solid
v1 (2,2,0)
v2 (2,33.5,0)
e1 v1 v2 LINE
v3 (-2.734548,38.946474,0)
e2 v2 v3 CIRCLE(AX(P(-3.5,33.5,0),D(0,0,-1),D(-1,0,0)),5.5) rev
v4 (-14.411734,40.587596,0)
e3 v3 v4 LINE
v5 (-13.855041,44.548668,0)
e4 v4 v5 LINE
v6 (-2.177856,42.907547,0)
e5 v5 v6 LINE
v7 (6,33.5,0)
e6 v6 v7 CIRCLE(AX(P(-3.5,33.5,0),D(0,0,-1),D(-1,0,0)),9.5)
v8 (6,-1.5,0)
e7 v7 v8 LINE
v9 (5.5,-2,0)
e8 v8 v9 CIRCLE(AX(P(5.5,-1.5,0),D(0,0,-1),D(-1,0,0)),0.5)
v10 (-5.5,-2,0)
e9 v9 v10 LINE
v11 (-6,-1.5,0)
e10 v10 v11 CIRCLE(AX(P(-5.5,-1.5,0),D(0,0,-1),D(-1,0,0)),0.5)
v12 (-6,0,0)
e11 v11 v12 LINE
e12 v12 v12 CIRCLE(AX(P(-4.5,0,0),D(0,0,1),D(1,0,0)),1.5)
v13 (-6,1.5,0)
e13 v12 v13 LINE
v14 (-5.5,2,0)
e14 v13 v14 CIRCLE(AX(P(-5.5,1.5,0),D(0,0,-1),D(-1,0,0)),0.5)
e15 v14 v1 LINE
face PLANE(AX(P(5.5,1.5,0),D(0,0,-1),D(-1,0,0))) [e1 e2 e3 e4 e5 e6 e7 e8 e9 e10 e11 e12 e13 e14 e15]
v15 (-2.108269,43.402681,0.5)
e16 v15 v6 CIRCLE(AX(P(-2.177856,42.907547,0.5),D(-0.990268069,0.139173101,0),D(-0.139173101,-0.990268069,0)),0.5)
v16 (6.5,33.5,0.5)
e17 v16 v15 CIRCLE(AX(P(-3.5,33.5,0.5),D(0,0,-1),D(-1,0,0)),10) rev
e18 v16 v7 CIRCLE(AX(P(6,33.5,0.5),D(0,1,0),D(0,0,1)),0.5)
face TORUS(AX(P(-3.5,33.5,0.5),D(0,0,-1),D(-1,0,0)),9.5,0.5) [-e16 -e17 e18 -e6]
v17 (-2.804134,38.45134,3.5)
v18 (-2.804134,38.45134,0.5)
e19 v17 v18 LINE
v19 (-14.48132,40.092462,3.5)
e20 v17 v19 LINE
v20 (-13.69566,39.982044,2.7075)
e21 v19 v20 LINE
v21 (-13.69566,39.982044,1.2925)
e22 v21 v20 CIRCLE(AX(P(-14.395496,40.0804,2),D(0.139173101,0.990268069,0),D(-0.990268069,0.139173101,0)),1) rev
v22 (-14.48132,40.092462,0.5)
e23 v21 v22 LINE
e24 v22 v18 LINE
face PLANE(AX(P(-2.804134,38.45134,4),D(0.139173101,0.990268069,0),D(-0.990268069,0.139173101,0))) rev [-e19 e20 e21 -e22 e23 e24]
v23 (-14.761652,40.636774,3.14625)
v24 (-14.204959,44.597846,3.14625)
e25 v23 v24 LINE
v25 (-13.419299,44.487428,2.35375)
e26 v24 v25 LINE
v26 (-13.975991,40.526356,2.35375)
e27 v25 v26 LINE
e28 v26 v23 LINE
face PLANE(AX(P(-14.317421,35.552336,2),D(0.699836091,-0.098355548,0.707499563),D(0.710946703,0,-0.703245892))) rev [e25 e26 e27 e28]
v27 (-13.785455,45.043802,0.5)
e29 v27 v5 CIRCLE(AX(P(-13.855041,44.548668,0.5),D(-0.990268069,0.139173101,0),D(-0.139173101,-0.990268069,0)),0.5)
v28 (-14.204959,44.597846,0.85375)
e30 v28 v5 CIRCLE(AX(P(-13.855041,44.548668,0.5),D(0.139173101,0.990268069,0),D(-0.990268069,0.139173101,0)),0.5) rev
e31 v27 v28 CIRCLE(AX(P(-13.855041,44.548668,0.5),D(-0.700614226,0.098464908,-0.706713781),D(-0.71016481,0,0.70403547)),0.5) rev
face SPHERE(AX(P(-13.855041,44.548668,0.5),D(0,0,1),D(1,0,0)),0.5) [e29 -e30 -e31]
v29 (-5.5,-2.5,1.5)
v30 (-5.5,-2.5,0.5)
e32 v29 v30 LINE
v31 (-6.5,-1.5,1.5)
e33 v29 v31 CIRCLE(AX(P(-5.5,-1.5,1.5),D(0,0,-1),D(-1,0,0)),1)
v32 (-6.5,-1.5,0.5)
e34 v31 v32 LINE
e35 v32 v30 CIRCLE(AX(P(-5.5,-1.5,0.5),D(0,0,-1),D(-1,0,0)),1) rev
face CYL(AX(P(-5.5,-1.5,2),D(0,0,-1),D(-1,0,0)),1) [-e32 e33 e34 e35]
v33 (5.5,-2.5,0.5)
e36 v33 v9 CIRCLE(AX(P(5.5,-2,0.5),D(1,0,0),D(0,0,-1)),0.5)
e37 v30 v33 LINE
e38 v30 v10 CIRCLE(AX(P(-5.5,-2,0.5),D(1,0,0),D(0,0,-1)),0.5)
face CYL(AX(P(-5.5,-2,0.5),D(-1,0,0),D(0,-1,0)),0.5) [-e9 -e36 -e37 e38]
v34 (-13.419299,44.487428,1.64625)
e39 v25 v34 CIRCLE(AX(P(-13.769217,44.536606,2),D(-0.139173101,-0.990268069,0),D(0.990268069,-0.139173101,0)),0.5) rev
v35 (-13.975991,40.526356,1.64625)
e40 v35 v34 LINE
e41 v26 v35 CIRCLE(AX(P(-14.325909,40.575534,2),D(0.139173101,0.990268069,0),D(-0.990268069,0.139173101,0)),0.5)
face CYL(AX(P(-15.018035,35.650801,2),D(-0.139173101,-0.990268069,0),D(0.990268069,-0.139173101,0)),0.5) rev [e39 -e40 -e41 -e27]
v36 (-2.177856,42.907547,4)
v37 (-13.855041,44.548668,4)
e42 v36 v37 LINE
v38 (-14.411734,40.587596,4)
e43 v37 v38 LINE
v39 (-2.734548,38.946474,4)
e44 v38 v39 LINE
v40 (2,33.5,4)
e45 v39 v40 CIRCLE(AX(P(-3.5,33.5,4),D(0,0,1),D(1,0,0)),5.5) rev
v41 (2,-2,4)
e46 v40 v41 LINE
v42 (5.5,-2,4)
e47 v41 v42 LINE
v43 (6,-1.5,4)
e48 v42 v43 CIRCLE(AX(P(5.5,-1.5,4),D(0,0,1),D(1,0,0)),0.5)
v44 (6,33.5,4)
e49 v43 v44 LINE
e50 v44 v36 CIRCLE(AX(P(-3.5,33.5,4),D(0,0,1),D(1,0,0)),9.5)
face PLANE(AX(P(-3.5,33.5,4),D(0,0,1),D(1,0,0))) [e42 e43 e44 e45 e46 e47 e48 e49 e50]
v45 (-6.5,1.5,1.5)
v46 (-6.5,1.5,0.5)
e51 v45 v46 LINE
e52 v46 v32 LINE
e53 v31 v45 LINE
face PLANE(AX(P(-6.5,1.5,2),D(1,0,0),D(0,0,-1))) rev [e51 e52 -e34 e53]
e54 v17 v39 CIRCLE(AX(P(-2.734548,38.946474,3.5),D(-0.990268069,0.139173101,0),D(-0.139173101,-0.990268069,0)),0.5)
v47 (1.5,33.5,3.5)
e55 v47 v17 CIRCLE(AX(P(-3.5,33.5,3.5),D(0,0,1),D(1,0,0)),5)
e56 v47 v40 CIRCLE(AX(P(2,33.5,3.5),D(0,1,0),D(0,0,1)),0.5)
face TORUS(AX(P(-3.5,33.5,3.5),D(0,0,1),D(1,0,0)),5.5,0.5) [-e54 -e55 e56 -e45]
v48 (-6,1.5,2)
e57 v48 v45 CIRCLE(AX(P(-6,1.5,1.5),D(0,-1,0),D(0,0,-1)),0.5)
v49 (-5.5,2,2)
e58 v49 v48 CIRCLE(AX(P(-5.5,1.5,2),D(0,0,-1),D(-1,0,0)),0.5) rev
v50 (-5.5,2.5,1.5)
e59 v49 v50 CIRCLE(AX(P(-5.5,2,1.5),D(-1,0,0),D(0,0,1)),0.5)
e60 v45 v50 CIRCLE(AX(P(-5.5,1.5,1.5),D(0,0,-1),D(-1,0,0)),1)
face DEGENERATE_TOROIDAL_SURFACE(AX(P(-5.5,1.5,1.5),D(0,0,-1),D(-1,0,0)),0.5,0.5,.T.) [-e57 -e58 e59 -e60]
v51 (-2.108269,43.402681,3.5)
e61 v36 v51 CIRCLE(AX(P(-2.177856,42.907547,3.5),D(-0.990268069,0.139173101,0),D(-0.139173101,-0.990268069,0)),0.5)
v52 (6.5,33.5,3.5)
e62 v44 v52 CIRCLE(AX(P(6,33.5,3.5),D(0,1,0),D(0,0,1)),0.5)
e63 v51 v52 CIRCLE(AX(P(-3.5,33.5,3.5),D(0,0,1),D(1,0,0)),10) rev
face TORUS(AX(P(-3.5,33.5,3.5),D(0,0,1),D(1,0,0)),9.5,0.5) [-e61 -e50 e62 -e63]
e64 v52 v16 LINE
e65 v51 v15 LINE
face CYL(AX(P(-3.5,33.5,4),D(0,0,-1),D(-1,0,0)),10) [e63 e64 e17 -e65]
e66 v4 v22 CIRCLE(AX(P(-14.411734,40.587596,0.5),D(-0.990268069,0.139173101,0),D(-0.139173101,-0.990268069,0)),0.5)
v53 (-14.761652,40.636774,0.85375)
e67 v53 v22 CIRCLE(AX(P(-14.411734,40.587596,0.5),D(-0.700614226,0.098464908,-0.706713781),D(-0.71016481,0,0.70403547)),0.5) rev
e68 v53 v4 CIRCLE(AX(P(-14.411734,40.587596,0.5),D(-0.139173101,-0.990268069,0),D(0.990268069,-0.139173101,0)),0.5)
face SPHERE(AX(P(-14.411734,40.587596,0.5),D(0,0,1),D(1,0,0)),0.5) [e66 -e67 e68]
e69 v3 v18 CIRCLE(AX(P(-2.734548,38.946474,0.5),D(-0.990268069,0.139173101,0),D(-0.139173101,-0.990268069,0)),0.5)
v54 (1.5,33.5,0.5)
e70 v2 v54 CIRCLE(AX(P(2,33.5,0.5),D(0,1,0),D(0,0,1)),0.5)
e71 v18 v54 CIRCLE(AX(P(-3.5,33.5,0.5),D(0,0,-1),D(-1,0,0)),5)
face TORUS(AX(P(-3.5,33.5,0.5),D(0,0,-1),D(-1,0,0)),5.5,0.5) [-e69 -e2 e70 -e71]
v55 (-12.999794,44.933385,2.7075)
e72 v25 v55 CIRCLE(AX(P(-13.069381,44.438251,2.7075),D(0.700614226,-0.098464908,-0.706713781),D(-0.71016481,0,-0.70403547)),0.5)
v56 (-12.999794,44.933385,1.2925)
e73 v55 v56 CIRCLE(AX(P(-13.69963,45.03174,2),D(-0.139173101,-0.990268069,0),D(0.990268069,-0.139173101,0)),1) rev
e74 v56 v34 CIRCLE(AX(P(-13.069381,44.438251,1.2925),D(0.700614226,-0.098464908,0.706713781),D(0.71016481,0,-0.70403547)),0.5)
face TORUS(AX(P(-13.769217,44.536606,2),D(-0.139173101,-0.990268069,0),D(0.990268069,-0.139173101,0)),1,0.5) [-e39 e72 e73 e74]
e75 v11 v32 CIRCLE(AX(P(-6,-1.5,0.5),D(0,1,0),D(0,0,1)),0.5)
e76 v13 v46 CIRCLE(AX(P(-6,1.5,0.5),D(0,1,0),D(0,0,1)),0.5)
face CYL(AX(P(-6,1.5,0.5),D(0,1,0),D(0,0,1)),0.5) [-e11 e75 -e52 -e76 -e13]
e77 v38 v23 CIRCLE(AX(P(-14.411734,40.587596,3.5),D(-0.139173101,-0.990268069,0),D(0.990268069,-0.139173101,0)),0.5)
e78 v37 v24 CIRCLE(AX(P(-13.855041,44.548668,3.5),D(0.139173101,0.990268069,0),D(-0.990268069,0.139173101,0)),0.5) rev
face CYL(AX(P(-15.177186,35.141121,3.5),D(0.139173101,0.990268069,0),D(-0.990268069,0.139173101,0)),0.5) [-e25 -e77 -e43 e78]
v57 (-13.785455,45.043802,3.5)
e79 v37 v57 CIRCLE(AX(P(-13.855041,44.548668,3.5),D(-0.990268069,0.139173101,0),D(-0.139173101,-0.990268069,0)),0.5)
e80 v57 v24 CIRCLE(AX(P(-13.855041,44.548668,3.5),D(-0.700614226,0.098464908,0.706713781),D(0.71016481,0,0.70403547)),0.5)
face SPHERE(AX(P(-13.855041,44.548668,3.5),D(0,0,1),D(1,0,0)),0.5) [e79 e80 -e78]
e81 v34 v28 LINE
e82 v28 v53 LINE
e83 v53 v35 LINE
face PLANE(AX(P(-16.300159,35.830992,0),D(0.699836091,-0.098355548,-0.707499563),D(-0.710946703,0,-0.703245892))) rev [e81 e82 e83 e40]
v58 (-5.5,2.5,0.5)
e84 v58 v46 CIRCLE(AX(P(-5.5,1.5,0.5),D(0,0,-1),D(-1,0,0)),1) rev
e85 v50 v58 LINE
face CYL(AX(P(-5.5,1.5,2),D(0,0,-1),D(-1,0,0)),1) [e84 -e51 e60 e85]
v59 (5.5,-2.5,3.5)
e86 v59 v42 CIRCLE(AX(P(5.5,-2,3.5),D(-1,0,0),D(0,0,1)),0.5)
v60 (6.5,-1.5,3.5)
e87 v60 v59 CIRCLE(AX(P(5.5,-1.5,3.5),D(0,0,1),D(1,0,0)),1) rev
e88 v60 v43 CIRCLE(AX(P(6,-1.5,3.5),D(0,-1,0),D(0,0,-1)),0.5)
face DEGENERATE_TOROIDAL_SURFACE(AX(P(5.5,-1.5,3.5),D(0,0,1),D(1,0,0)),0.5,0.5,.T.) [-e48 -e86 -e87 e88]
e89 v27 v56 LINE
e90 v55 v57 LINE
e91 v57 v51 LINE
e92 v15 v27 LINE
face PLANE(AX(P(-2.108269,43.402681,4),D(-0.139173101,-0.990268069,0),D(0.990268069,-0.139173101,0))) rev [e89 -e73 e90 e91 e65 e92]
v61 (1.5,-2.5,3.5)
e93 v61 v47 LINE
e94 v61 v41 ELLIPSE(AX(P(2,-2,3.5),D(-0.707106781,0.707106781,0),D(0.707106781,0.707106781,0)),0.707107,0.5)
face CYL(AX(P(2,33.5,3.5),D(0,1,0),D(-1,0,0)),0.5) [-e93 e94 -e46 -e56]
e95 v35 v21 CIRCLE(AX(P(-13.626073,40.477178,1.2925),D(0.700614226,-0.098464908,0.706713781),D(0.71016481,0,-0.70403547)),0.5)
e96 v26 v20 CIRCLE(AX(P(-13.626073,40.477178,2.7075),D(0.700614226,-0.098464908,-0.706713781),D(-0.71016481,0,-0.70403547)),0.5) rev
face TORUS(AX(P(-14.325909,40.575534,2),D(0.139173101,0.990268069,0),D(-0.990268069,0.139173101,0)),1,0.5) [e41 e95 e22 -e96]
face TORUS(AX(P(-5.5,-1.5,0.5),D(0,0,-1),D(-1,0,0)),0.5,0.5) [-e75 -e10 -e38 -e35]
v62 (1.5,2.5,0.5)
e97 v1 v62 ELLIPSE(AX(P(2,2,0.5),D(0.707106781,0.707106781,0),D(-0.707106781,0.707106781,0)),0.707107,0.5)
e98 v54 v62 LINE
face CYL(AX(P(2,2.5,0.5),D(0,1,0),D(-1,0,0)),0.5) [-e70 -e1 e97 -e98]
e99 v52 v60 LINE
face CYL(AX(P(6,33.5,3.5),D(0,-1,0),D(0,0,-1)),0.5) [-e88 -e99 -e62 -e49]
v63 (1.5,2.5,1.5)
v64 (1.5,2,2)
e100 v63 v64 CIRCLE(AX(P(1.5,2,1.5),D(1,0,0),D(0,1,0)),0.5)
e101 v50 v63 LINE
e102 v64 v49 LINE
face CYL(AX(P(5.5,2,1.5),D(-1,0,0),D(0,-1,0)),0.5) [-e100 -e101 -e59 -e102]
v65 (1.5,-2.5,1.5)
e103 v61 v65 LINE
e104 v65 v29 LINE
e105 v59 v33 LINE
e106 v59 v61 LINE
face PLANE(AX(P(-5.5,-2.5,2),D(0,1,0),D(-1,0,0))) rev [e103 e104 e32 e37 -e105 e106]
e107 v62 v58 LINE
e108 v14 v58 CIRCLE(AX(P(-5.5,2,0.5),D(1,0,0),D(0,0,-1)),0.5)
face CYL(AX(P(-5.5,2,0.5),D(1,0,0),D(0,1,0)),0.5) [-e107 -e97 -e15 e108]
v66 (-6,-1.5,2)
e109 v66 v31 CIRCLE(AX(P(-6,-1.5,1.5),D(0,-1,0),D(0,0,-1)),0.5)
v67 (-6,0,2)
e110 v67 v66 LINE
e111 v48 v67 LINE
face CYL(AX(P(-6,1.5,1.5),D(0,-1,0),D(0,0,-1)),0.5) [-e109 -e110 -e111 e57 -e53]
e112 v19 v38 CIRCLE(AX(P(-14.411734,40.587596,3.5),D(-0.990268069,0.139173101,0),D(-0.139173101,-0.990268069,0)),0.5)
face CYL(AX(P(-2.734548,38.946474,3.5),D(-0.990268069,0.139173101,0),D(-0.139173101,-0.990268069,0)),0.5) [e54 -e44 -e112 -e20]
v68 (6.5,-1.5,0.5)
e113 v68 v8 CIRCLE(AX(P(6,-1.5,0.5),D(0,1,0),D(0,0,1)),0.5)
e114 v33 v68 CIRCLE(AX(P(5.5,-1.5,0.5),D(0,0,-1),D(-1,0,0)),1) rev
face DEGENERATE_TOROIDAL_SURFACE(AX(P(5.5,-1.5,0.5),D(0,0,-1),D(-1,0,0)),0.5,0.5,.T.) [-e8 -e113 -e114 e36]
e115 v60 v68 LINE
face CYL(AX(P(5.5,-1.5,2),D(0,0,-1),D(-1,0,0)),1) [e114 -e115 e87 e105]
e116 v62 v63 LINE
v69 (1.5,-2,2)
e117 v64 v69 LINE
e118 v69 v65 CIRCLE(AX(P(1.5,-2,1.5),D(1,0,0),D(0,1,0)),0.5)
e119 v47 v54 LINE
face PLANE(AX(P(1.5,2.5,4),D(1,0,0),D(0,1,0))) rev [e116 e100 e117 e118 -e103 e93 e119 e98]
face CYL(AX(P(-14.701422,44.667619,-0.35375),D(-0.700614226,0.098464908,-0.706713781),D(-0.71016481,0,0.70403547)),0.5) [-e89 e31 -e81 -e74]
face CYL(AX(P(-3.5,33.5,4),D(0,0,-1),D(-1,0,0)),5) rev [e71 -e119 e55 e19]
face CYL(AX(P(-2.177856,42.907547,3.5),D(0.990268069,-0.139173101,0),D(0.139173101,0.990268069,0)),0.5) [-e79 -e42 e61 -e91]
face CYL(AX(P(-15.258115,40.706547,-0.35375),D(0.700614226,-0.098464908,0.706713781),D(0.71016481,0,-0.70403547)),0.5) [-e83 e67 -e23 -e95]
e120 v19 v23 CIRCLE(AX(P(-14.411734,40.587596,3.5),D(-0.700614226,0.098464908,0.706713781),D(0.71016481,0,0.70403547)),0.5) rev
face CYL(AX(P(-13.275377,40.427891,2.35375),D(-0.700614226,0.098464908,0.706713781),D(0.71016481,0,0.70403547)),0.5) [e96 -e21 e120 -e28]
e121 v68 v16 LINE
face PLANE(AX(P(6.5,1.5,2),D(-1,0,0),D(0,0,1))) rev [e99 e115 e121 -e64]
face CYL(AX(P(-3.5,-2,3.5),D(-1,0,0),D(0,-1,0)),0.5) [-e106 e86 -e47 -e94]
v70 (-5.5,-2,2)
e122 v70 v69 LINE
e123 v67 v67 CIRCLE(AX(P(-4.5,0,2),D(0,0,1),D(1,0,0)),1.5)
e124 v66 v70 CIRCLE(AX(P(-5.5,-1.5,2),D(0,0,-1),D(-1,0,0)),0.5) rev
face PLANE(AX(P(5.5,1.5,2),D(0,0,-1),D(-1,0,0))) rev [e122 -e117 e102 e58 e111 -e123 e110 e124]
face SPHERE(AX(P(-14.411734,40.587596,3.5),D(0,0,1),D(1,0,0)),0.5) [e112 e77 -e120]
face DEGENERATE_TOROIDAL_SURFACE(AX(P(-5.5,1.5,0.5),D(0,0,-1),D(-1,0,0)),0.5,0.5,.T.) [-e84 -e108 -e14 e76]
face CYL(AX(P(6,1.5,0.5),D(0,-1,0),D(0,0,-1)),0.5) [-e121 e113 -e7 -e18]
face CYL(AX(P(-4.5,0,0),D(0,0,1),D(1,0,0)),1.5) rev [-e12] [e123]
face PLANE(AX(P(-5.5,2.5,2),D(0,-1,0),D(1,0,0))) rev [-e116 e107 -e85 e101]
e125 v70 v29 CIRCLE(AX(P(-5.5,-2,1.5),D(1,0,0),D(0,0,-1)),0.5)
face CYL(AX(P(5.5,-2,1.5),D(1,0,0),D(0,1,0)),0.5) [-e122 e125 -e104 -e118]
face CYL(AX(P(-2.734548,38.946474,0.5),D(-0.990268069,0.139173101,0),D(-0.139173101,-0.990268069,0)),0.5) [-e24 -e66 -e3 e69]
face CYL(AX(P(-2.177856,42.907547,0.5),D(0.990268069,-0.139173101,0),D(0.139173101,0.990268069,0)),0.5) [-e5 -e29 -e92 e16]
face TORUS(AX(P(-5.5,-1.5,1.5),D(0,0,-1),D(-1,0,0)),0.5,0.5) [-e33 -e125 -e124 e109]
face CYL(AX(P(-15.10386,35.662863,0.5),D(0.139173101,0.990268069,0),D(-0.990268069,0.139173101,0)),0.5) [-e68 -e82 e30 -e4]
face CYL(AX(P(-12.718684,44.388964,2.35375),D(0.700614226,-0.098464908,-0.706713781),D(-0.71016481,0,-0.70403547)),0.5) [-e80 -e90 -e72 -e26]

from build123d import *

# Parameters (mm, degrees)
EXTRUDE_1_DEPTH     = 2
EXTRUDE_2_DEPTH     = 2
CUT_EXTRUDE_1_DEPTH = 5
SKETCH_4_R          = 1.5
CUT_EXTRUDE_2_DEPTH = 48.894743495
FILLET_1_R          = 0.5


with BuildPart() as part:
    # 草图1 → 凸台-拉伸1 (new body)
    with BuildSketch(Plane.XY):
        with BuildLine():
            Line((-5.5, 2.5), (5.5, 2.5))
            ThreePointArc((5.5, 2.5), (6.207106781, 2.207106781), (6.5, 1.5))
            Line((6.5, 1.5), (6.5, -1.5))
            ThreePointArc((6.5, -1.5), (6.207106781, -2.207106781), (5.5, -2.5))
            Line((5.5, -2.5), (-5.5, -2.5))
            ThreePointArc((-5.5, -2.5), (-6.207106781, -2.207106781), (-6.5, -1.5))
            Line((-6.5, -1.5), (-6.5, 1.5))
            ThreePointArc((-6.5, 1.5), (-6.207106781, 2.207106781), (-5.5, 2.5))
        make_face()
    extrude(amount=EXTRUDE_1_DEPTH)

    # 草图2 → 凸台-拉伸2 (add, symmetric)
    with BuildSketch(Plane.XY.offset(2)):
        with BuildLine():
            Line((6.5, 1.5), (6.5, 33.5))
            ThreePointArc((6.5, 33.5), (4.047095802, 40.06059029), (-2.10826899, 43.402680687))
            Line((-2.10826899, 43.402680687), (-14.981753884, 45.211931))
            Line((-14.981753884, 45.211931), (-15.677619389, 40.260590656))
            Line((-15.677619389, 40.260590656), (-2.804134495, 38.451340344))
            ThreePointArc((-2.804134495, 38.451340344), (0.273547901, 36.780295145), (1.5, 33.5))
            Line((1.5, 33.5), (1.5, 2.5))
            Line((1.5, 2.5), (1.5, -2.5))
            Line((1.5, -2.5), (5.5, -2.5))
            ThreePointArc((5.5, -2.5), (6.207106781, -2.207106781), (6.5, -1.5))
            Line((6.5, -1.5), (6.5, 1.5))
        make_face()
    extrude(amount=EXTRUDE_2_DEPTH, both=True)

    # 草图3 → 切除-拉伸1 (cut)
    with BuildSketch(Plane(origin=(5.940864687, 42.271448722, 0), x_dir=(0.9902680687415704, -0.13917310096006608, 0), z_dir=(0.13917310096006608, 0.9902680687415704, 0))):
        Polygon((-21.128237123, 0), (-19.126013359, -2), (-21.128237123, -4), align=None)
    extrude(amount=-CUT_EXTRUDE_1_DEPTH, mode=Mode.SUBTRACT)

    # 草图4 → 切除-拉伸2 (cut, through all)
    with BuildSketch(Plane.XY.offset(2)):
        with Locations((-4.5, 0)):
            Circle(SKETCH_4_R)
    extrude(amount=-CUT_EXTRUDE_2_DEPTH, mode=Mode.SUBTRACT)

    # 圆角1
    fillet_1_edges = [part.edges().sort_by_distance(p)[0] for p in [
        (-6.5, 0, 0),
        (-6.207106781, 2.207106781, 0),
        (-6.207106781, 2.207106781, 2),
        (-6.5, 0, 2),
        (-6.207106781, -2.207106781, 2),
        (-2, -2.5, 2),
        (-2, 2.5, 0),
        (-2, 2.5, 2),
        (1.5, 18, 0),
        (4.047095802, 40.06059029, 0),
        (-8.545011437, 44.307305844, 0),
        (-15.329686636, 42.736260828, 0),
        (-9.240876942, 39.3559655, 0),
        (0.273547901, 36.780295145, 0),
        (6.5, 16, 4),
        (4.047095802, 40.06059029, 4),
        (-8.545011437, 44.307305844, 4),
        (-15.329686636, 42.736260828, 4),
        (-9.240876942, 39.3559655, 4),
        (0.273547901, 36.780295145, 4),
        (1.5, 15.5, 4),
        (3.5, -2.5, 4),
        (6.207106781, -2.207106781, 4),
        (-13.346948377, 42.457605138, 2),
        (-13.990384754, 45.072603155, 3),
        (-13.990384754, 45.072603155, 1),
        (-14.686250259, 40.121262811, 1),
        (-14.686250259, 40.121262811, 3),
        (6.5, 16, 0),
        (6.207106781, -2.207106781, 0),
        (0, -2.5, 0),
        (-6.207106781, -2.207106781, 0),
    ]]
    fillet(fillet_1_edges, radius=FILLET_1_R - 0.0001)  # a hair under: the kernel refuses the full size


solid = part.part
